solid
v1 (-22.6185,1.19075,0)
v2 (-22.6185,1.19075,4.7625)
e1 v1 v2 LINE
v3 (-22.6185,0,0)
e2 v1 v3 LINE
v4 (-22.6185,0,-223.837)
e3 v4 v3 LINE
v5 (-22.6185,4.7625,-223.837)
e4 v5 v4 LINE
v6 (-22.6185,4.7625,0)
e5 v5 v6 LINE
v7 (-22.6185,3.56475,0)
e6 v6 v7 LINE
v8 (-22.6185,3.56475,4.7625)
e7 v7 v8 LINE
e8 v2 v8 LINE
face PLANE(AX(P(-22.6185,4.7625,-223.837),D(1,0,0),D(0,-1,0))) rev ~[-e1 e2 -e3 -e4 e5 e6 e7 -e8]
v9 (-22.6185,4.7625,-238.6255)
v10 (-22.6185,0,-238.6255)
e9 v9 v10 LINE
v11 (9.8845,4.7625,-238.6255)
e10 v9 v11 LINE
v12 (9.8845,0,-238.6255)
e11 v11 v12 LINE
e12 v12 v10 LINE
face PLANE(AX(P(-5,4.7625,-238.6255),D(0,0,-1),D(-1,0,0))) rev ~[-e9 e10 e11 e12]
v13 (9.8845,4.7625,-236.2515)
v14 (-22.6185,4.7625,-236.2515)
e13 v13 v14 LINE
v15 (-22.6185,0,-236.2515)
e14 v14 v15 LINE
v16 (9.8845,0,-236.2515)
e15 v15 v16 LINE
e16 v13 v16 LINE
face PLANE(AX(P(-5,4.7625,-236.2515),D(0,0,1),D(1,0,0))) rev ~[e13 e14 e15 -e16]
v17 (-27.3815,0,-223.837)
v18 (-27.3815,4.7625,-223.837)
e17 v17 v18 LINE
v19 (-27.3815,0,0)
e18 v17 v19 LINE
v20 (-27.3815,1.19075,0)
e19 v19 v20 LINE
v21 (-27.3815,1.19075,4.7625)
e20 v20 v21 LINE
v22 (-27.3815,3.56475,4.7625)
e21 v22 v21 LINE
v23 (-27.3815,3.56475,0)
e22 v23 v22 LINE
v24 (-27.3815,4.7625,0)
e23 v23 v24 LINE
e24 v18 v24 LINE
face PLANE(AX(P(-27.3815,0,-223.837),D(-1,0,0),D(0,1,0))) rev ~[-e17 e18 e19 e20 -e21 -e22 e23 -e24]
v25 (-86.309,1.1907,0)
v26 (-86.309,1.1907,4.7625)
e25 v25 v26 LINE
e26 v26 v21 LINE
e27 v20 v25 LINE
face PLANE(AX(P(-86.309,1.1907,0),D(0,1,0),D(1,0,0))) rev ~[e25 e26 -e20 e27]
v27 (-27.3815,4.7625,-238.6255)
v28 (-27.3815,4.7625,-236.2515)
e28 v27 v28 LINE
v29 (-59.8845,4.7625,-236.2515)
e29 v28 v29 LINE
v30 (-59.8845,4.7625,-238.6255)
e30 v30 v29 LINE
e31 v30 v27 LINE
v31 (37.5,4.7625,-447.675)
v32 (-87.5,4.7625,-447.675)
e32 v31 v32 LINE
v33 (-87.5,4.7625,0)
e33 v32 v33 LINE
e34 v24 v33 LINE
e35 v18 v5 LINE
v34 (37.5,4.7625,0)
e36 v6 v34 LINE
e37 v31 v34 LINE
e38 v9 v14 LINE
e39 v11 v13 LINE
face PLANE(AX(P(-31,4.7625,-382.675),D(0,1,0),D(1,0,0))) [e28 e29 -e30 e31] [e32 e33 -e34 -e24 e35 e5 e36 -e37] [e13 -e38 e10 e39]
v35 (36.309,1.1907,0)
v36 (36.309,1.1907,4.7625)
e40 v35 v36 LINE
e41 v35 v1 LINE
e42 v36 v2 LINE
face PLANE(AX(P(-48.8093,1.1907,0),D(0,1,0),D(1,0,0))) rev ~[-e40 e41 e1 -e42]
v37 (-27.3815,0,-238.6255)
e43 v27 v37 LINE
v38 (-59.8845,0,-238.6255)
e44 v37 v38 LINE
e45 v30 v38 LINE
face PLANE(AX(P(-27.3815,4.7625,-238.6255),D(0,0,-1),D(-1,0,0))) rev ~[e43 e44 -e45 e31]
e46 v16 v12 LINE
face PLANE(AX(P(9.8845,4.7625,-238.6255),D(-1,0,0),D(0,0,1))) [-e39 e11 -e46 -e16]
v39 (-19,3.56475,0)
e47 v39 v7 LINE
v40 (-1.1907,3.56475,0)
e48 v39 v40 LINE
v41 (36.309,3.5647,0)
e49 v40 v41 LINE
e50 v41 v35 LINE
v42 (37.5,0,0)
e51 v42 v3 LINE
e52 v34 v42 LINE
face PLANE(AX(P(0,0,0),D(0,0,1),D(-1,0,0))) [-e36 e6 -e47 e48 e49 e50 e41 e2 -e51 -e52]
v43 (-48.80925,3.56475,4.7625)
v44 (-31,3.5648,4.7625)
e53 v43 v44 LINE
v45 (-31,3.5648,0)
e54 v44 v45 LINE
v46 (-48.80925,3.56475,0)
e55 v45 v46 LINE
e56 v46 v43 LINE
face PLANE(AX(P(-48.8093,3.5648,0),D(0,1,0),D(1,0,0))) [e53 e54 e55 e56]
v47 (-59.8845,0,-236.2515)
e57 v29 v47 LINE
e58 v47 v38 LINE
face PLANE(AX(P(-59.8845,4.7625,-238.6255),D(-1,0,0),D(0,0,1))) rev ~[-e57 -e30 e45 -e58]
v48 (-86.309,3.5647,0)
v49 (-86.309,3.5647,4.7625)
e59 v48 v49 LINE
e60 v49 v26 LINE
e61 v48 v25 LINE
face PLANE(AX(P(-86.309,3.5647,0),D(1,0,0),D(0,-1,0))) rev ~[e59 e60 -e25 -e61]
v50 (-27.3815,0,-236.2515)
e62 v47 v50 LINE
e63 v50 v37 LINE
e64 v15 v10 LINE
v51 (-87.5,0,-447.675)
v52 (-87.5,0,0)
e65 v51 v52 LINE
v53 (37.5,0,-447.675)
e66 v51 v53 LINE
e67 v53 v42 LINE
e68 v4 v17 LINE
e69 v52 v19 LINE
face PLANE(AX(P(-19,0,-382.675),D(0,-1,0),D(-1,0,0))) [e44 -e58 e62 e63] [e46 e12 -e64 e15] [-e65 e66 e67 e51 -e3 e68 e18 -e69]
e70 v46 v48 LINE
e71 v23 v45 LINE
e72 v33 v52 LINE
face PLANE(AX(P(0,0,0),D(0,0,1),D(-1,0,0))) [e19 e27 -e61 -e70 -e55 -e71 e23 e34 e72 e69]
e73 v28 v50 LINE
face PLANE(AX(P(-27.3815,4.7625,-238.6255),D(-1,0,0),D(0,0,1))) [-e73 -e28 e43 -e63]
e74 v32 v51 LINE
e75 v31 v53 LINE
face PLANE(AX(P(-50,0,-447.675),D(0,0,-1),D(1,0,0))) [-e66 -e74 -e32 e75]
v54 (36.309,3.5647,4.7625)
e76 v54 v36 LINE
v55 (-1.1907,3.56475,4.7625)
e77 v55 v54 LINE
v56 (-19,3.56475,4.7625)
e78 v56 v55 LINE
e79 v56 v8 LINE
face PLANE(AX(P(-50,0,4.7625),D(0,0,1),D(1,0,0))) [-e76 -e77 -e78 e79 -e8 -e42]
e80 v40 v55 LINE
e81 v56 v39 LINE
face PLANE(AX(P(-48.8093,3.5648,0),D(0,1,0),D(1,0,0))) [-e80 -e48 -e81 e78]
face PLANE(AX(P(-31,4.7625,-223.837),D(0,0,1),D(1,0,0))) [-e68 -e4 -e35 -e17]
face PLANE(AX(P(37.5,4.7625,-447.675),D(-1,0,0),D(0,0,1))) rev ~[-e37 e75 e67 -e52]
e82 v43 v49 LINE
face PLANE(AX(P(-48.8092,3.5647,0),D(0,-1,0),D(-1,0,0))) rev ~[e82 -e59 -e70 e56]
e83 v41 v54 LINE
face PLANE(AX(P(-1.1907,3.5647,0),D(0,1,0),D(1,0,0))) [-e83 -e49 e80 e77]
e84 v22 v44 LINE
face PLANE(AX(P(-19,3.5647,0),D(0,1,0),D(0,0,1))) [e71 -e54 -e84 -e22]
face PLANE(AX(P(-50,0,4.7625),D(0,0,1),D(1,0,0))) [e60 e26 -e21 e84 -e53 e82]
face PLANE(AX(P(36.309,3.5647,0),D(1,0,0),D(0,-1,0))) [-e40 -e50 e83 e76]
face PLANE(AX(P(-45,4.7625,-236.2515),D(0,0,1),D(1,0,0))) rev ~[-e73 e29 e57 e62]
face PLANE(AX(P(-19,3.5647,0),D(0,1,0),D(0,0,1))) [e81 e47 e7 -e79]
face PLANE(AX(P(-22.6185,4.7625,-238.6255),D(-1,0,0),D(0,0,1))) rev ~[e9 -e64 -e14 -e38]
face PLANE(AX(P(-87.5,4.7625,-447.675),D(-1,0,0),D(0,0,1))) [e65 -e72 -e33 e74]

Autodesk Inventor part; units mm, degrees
ref_plane "YZ Plane" through (0, 0, 0) normal (1, 0, 0) x (0, 1, 0)
ref_plane "XZ Plane" through (0, 0, 0) normal (0, 1, 0) x (-1, 0, 0)
ref_plane "XY Plane" through (0, 0, 0) normal (0, 0, 1) x (1, 0, 0)
sketch "Sketch1" plane through (0, 0, 0) normal (0, 1, 0) x (-1, 0, 0)
  line L0 (0, 0) -> (50, 0)
  line L1 (50, 0) -> (50, -447.675)
  line L2 (50, -447.675) -> (0, -447.675)
  line L3 (0, -447.675) -> (0, 0)
  dimension "d0" = 50
  dimension "d1" = 447.675
extrude "Extrusion1" add sketch "Sketch1" along normal blind 4.7625
sketch "Sketch2" plane through (-50, 0, 0) normal (0, 0, 1) x (1, 0, 0)
  line L0 (1.1907, 3.5648) -> (1.1907, 1.1907)
  line L1 (50, 0) -> (0, 0) projected
  line L2 (50, 4.7625) -> (0, 4.7625) projected
  line L3 (1.1907, 1.1907) -> (48.8093, 1.1907)
  line L4 (1.1907, 3.5648) -> (48.8093, 3.5648)
  line L5 (48.8093, 3.5648) -> (48.8093, 1.1907)
  line L6 (50, 0) -> (50, 4.7625) projected
extrude "Extrusion2" add sketch "Sketch2" along normal blind 4.7625
sketch "Sketch3" plane through (0, 4.7625, 0) normal (0, 1, 0) x (1, 0, 0)
  line L0 (-50, 447.675) -> (-50, 0) projected
  line L1 (-50, 447.675) -> (-25, 447.675)
  line L2 (0, 447.675) -> (-50, 447.675) projected
  line L3 (-25, 447.675) -> (-25, 382.675)
  line L4 (-31, 382.675) -> (-19, 382.675)
  line L5 (-31, 382.675) -> (-31, 0)
  line L6 (-1.1907, 0) -> (-48.8093, 0) projected
  line L7 (-19, 382.675) -> (-19, 0)
  line L8 (-31, 0) -> (-19, 0)
  point P0 (0, 0)
  dimension "d11" = 25
extrude "Extrusion3" cut sketch "Sketch3" against normal blind 10
sketch "Sketch4" plane through (-50, 0, 4.7625) normal (0, 0, 1) x (1, 0, 0)
  line L0 (31, 3.5648) -> (31, 1.1907) projected
  line L1 (31, 1.1907) -> (31, 3.5648)
  line L2 (19, 3.5648) -> (31, 3.5648) projected
  line L3 (31, 3.5648) -> (19, 3.5648)
  line L4 (19, 3.5648) -> (19, 1.1907)
  line L5 (19, 1.1907) -> (31, 1.1907)
  point P0 (50, 0)
extrude "Extrusion4" cut sketch "Sketch4" against normal blind 10
sketch "Sketch5" plane through (0, 4.7625, 0) normal (0, 1, 0) x (1, 0, 0)
  point P0 (0, 0)
sketch "Sketch6" plane through (-31, 4.7625, -382.675) normal (0, 0, 1) x (1, 0, 0)
  line L0 (12, -4.7625) -> (0, -4.7625) projected
  line L1 (12, 0) -> (12, -4.7625) projected
  line L2 (0, 0) -> (12, 0) projected
  line L3 (0, 0) -> (0, -4.7625) projected
  point P0 (31, -4.7625)
extrude "Extrusion5" add sketch "Sketch6" along normal blind 158.838
sketch "Sketch8" plane through (-31, 4.7625, -223.837) normal (0, 0, 1) x (1, 0, 0)
  line L0 (3.6185, -4.7625) -> (3.6185, 0)
  line L1 (3.6185, 0) -> (8.3815, 0)
  line L2 (8.3815, 0) -> (8.3815, -4.7625)
  line L3 (3.6185, -4.7625) -> (8.3815, -4.7625)
  line L4 (0, -4.7625) -> (12, -4.7625) projected
  line L5 (-19, 0) -> (0, 0) projected
  line L6 (0, 0) -> (3.6185, 0)
  line L7 (12, 0) -> (0, 0) projected
  line L8 (3.6185, -4.7625) -> (0, -4.7625)
  line L9 (0, -4.7625) -> (0, 0) projected
  line L10 (0, -4.7625) -> (0, 0)
  line L11 (8.3815, 0) -> (12, 0)
  line L12 (12, -3.5718) -> (12, -4.7625) projected
  line L13 (12, -4.7625) -> (8.3815, -4.7625)
  line L14 (12, -4.7625) -> (12, 0)
  point P0 (31, -4.7625)
  dimension "d25" = 4.763
extrude "Extrusion6" add sketch "Sketch8" along normal blind 223.837 contours L4 L9 L6 L0 | L2 L7 L14 L12 L4
sketch "Sketch9" plane through (-19, 1.1907, 0) normal (-1, 0, 0) x (0, 0, 1)
  line L0 (0, 2.374) -> (0, 0) projected
  line L1 (4.7625, 0) -> (0, 0) projected
  line L2 (4.7625, 2.374) -> (4.7625, 0) projected
  line L3 (0, 2.374) -> (4.7625, 2.374) projected
  point P0 (0, -1.1907)
extrude "Extrusion7" add sketch "Sketch9" along normal blind 15
sketch "Sketch10" plane through (-22.6185, 3.5648, 0) normal (0, 0, -1) x (-1, 0, 0)
  line L0 (4.763, -2.374) -> (4.763, 0) projected
  line L1 (0, 0) -> (4.763, 0) projected
  line L2 (0, 0) -> (0, -2.374) projected
  line L3 (0, -2.374) -> (4.763, -2.374) projected
  point P0 (-22.6185, -3.5648)
extrude "Extrusion8" cut sketch "Sketch10" against normal blind 15
sketch "Sketch14" plane through (0, 4.7625, 0) normal (0, 1, 0) x (1, 0, 0)
  line L0 (0, 447.675) -> (-50, 447.675) projected
  line L1 (0, 0) -> (0, 447.675) projected
  line L2 (-50, 447.675) -> (-50, 0) projected
  line L3 (-27.3815, 223.837) -> (-27.3815, 0) projected
  line L4 (-22.6185, 223.837) -> (-22.6185, 0) projected
  line L5 (-5, 231.488) -> (-22.6185, 231.488)
  line L6 (-22.6185, 231.488) -> (-22.6185, 233.862)
  line L7 (-22.6185, 233.862) -> (-5, 233.862)
  line L8 (-5, 231.488) -> (-5, 233.862)
  line L9 (-27.3815, 223.837) -> (-22.6185, 223.837) projected
  line L10 (-45, 231.488) -> (-27.3815, 231.488)
  line L11 (-27.3815, 231.488) -> (-27.3815, 233.862)
  line L12 (-27.3815, 233.862) -> (-45, 233.862)
  line L13 (-45, 231.488) -> (-45, 233.862)
  dimension "d35" = 2.374
extrude "Extrusion9" cut sketch "Sketch14" against normal blind 10
sketch "Sketch17" plane through (0, 4.7625, 0) normal (0, 1, 0) x (1, 0, 0)
  line L0 (-50, 447.675) -> (-50, 0) projected
  line L1 (-50, 235.0565) -> (0, 235.0565)
  line L2 (0, 0) -> (0, 447.675) projected
  line L3 (-45, 231.488) -> (-45, 233.862) projected
  line L4 (-45, 236.2515) -> (-45, 238.6255)
  line L5 (-45, 238.6255) -> (-27.3815, 238.6255)
  line L6 (-45, 236.2515) -> (-27.3815, 236.2515)
  line L7 (-27.3815, 238.6255) -> (-27.3815, 236.2515)
  line L8 (-5, 236.2515) -> (-5, 238.6255)
  line L9 (-5, 238.6255) -> (-22.6185, 238.6255)
  line L10 (-5, 236.2515) -> (-22.6185, 236.2515)
  line L11 (-22.6185, 238.6255) -> (-22.6185, 236.2515)
  point P0 (-27.3815, 231.488)
  dimension "d43" = 2.374
extrude "Extrusion10" cut sketch "Sketch17" against normal blind 10
sketch "Sketch18" plane through (0, 4.7625, 0) normal (0, 1, 0) x (1, 0, 0)
  line L0 (-45, 233.862) -> (-45, 231.488) projected
  line L1 (-45, 233.862) -> (-45, 231.488)
  line L2 (-27.3815, 233.862) -> (-45, 233.862) projected
  line L3 (-45, 233.862) -> (-27.3815, 233.862)
  line L4 (-27.3815, 233.862) -> (-27.3815, 231.488) projected
  line L5 (-27.3815, 233.862) -> (-27.3815, 231.488)
  line L6 (-27.3815, 231.488) -> (-45, 231.488)
  line L7 (-22.6185, 231.488) -> (-5, 231.488) projected
  line L8 (-5, 231.488) -> (-22.6185, 231.488)
  line L9 (-22.6185, 231.488) -> (-22.6185, 233.862)
  line L10 (-22.6185, 233.862) -> (-5, 233.862)
  line L11 (-5, 231.488) -> (-5, 233.862) projected
  line L12 (-5, 233.862) -> (-5, 231.488)
  point P0 (0, 0)
extrude "Extrusion11" add sketch "Sketch18" against normal up to surface (4.7625 mm away)
sketch "Sketch19" plane through (0, 4.7625, 0) normal (0, 1, 0) x (1, 0, 0)
  line L0 (0, 0) -> (0, 447.675) projected
  line L1 (0, 0) -> (37.5, 0)
  line L2 (0, 447.675) -> (-50, 447.675) projected
  line L3 (0, 447.675) -> (37.5, 447.675)
  line L4 (37.5, 447.675) -> (37.5, 0)
  line L5 (0, 0) -> (0, 447.675)
  line L6 (-50, 0) -> (-50, 447.675)
  line L7 (-50, 0) -> (-87.5, 0)
  line L8 (-50, 447.675) -> (-87.5, 447.675)
  line L9 (-87.5, 447.675) -> (-87.5, 0)
  dimension "d48" = 37.5
  dimension "d49" = 37.5
extrude "Extrusion12" add sketch "Sketch19" against normal up to surface (4.7625 mm away)
sketch "Sketch20" plane through (-1.1907, 1.1907, 0) normal (0, 0, 1) x (1, 0, 0)
  line L0 (37.4997, 0) -> (0, 0)
  line L1 (0, 2.374) -> (0, 0) projected
  line L2 (0, 0) -> (0, 2.374)
  line L3 (0, 2.374) -> (0, 0)
  line L4 (0, 2.374) -> (37.4997, 2.374)
  line L5 (37.4997, 2.374) -> (37.4997, 0)
  line L6 (-26.1908, -1.1907) -> (-21.4278, -1.1907) projected
  line L7 (-21.4278, 3.5718) -> (-26.1908, 3.5718) projected
  line L8 (-85.1183, 0) -> (-47.6185, 0)
  line L9 (-47.6185, 2.374) -> (-47.6185, 0)
  line L10 (-47.6185, 2.374) -> (-85.1183, 2.374)
  line L11 (-85.1183, 2.374) -> (-85.1183, 0)
extrude "Extrusion13" add sketch "Sketch20" along normal up to surface (4.7625 mm away)
sketch "Sketch21" plane through (0, 4.7625, 0) normal (0, 1, 0) x (1, 0, 0)
  line L0 (-22.6185, 236.2515) -> (-5, 236.2515) projected
  line L1 (-22.6185, 236.2515) -> (9.8845, 236.2515)
  line L2 (-22.6185, 238.6255) -> (-22.6185, 236.2515) projected
  line L3 (9.8845, 238.6255) -> (9.8845, 236.2515)
  line L4 (-22.6185, 238.6255) -> (-22.6185, 236.2515)
  line L5 (-27.3815, 223.837) -> (-22.6185, 223.837) projected
  line L6 (-22.6185, 238.6255) -> (9.8845, 238.6255)
  line L7 (-27.3815, 236.2515) -> (-59.8845, 236.2515)
  line L8 (-27.3815, 238.6255) -> (-27.3815, 236.2515)
  line L9 (-59.8845, 238.6255) -> (-59.8845, 236.2515)
  line L10 (-27.3815, 238.6255) -> (-59.8845, 238.6255)
  point P0 (0, 0)
extrude "Extrusion14" cut sketch "Sketch21" against normal blind 10
properties part number "Sustainable Chair_V1 - Leg" material "Foam Board - V3"
